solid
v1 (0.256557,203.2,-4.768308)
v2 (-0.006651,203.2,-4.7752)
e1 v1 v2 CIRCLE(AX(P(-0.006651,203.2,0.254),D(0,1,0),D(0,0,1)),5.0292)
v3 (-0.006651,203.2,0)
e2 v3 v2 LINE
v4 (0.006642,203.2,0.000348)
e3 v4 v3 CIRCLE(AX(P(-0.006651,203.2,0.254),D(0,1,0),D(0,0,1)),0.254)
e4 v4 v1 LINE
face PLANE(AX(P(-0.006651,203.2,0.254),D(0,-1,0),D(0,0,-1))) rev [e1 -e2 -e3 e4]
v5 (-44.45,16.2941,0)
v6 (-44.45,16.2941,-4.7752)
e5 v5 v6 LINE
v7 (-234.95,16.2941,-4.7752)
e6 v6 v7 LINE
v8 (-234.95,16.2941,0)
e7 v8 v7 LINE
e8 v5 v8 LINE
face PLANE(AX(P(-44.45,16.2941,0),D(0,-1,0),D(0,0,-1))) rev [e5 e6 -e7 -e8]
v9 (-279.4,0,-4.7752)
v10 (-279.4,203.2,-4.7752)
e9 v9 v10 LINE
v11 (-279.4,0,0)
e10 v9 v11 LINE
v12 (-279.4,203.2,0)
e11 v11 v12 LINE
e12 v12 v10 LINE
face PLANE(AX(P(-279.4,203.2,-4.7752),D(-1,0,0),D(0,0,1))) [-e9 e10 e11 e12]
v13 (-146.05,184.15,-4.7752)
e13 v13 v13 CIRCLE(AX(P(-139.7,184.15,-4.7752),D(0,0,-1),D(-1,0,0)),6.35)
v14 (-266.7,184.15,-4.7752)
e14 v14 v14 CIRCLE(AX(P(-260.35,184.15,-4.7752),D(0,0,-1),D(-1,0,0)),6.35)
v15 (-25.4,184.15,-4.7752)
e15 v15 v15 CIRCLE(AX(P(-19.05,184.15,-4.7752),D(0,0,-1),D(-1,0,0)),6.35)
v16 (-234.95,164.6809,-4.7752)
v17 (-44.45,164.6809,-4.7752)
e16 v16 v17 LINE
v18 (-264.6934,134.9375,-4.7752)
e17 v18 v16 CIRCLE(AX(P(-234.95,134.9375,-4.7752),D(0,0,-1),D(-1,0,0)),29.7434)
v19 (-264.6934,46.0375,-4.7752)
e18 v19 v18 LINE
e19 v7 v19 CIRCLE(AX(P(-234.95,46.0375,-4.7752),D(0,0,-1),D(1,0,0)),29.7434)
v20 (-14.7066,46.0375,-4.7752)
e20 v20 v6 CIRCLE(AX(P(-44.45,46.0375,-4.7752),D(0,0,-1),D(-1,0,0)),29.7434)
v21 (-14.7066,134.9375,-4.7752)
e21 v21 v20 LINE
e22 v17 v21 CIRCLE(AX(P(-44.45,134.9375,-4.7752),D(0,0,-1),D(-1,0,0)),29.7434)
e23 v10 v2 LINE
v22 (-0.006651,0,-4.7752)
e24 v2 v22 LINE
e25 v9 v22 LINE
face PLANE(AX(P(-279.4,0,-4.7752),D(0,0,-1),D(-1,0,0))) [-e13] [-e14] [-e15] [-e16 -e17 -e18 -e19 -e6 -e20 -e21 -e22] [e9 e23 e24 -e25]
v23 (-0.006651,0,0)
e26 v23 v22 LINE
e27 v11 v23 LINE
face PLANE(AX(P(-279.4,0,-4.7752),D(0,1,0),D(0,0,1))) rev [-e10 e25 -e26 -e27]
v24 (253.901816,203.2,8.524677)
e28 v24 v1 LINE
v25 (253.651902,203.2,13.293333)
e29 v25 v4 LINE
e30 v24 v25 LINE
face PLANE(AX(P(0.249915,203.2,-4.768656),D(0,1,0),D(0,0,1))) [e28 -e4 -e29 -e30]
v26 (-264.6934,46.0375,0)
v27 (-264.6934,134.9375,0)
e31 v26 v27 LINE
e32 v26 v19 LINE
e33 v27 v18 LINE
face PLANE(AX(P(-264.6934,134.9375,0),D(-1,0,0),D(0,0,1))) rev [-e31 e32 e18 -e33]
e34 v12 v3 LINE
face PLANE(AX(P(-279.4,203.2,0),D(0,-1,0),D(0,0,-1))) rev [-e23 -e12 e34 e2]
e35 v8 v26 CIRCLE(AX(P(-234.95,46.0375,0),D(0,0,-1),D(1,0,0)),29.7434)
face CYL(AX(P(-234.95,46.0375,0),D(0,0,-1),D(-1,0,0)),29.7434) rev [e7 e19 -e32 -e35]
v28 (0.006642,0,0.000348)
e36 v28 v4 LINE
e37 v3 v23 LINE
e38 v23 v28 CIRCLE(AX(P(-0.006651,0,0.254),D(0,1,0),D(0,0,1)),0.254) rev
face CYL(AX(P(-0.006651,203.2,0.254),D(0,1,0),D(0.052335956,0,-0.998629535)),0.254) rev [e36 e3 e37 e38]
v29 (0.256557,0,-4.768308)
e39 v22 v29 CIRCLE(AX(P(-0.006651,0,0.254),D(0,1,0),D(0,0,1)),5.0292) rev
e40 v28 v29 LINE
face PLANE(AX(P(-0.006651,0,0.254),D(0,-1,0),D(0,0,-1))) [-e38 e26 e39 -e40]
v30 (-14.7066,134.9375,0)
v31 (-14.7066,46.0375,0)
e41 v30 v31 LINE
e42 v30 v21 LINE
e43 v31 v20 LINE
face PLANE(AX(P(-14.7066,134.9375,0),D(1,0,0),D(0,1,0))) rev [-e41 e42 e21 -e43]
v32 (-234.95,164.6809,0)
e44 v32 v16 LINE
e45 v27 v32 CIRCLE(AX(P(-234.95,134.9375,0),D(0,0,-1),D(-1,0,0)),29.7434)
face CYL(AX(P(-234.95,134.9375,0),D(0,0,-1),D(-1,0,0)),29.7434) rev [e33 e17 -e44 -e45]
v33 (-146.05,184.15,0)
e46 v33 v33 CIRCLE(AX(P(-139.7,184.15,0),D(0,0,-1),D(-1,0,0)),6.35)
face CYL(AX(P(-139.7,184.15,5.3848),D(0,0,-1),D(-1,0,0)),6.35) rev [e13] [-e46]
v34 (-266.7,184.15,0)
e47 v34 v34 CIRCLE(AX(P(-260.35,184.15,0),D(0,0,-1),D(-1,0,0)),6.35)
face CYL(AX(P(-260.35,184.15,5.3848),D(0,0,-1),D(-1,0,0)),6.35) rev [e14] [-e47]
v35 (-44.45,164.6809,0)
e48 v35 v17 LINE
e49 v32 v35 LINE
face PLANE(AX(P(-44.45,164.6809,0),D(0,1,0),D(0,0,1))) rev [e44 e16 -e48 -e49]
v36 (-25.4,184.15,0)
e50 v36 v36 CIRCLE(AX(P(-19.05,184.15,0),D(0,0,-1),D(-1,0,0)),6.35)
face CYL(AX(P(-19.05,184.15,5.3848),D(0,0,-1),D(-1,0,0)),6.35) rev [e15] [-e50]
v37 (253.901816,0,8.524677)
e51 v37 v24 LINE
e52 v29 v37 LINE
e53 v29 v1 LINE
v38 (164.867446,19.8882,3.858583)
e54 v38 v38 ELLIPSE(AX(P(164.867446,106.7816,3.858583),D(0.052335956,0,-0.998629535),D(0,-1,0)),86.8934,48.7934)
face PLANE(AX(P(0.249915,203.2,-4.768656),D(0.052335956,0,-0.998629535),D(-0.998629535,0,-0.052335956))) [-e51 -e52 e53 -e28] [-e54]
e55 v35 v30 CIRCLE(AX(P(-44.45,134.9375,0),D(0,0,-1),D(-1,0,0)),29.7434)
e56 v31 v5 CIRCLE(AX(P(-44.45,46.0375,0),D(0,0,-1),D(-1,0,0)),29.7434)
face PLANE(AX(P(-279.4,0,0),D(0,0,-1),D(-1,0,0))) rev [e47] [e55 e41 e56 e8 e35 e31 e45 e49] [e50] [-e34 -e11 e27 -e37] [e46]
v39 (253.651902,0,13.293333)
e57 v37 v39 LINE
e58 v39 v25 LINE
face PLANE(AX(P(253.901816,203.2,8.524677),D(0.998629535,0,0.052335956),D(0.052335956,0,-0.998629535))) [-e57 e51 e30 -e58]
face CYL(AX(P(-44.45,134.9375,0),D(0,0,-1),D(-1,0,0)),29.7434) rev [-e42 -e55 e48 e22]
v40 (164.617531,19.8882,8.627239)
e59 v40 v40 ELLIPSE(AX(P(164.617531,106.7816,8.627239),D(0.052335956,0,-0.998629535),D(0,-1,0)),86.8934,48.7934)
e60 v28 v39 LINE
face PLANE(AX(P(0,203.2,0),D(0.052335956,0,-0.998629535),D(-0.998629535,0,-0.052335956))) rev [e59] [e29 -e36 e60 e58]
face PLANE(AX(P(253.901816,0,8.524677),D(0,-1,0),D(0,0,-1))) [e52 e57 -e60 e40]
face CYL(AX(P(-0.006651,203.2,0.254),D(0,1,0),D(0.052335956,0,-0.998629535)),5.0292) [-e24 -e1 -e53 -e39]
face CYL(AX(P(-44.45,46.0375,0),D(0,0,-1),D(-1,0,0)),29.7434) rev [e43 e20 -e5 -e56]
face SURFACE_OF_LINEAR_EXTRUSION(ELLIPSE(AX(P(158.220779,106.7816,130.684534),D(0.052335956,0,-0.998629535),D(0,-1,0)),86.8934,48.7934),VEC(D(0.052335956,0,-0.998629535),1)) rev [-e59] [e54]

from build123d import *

# Parameters (mm, degrees)
SKETCH1_W                    = 4.7752
SKETCH1_H                    = 203.2
BASE_FLANGE1_DEPTH           = 279.4
SKETCH2_R                    = 6.35
CUT_EXTRUDE1_DEPTH           = 10.16
CUT_EXTRUDE2_DEPTH           = 4.7752
EDGE_FLANGE2_STRIP_CUT_DEPTH = 203.2
EDGE_FLANGE2_DEPTH           = 203.2
SKETCH19_RX                  = 86.8934
SKETCH19_RY                  = 48.7934
CUT_EXTRUDE3_DEPTH           = 127


# Sheet-metal steps are written as plain solids
with BuildPart() as part:
    # Sketch1 → Base-Flange1 (new body)
    with BuildSketch(Plane(origin=(0, 0, 0), x_dir=(0, 0, -1), z_dir=(1, 0, 0))):
        with Locations((2.3876, 101.6)):
            Rectangle(SKETCH1_W, SKETCH1_H)
    extrude(amount=-BASE_FLANGE1_DEPTH)

    # Sketch2 → Cut-Extrude1 (cut)
    with BuildSketch(Plane(origin=(0, 0, -4.7752), x_dir=(-1, 0, 0), z_dir=(0, 0, -1))):
        with Locations((19.05, 184.15)):
            Circle(SKETCH2_R)
        with Locations((139.7, 184.15)):
            Circle(SKETCH2_R)
        with Locations((260.35, 184.15)):
            Circle(SKETCH2_R)
    extrude(amount=-CUT_EXTRUDE1_DEPTH, mode=Mode.SUBTRACT)

    # Sketch3 → Cut-Extrude2 (cut)
    with BuildSketch(Plane(origin=(0, 0, -4.7752), x_dir=(-1, 0, 0), z_dir=(0, 0, -1))):
        with BuildLine():
            Line((14.7066, 134.9375), (14.7066, 46.0375))
            ThreePointArc((14.7066, 46.0375), (23.418240164, 25.005740164), (44.45, 16.2941))
            Line((44.45, 16.2941), (234.95, 16.2941))
            ThreePointArc((234.95, 16.2941), (255.981759836, 25.005740164), (264.6934, 46.0375))
            Line((264.6934, 46.0375), (264.6934, 134.9375))
            ThreePointArc((264.6934, 134.9375), (255.981759836, 155.969259836), (234.95, 164.6809))
            Line((234.95, 164.6809), (44.45, 164.6809))
            ThreePointArc((44.45, 164.6809), (23.418240164, 155.969259836), (14.7066, 134.9375))
        make_face()
        with BuildLine():
            Line((44.45, 153.9875), (234.95, 153.9875))
            ThreePointArc((234.95, 153.9875), (248.420384182, 148.407884182), (254, 134.9375))
            Line((254, 134.9375), (254, 46.0375))
            ThreePointArc((254, 46.0375), (248.420384182, 32.567115818), (234.95, 26.9875))
            Line((234.95, 26.9875), (44.45, 26.9875))
            ThreePointArc((44.45, 26.9875), (30.979615818, 32.567115818), (25.4, 46.0375))
            Line((25.4, 46.0375), (25.4, 134.9375))
            ThreePointArc((25.4, 134.9375), (30.979615818, 148.407884182), (44.45, 153.9875))
        make_face(mode=Mode.SUBTRACT)
    extrude(amount=-CUT_EXTRUDE2_DEPTH, mode=Mode.SUBTRACT)


with BuildPart() as cut_extrude2_kept_piece:
    # of the separate pieces the step leaves, the one the design keeps (cut_extrude2_pieces_kept)
    add(part.part.solids().sort_by_distance((0, 0, 0))[0])

    # Edge-Flange2 strip (across the edge) → Edge-Flange2 strip cut (cut)
    with BuildSketch(Plane(origin=(0, 0, 0), x_dir=(-0.052335956242937604, 0, 0.9986295347545743), z_dir=(0, 1, 0))):
        Polygon((-5.794552955, 19.325370054), (-4.768307656, -0.256556767), (0.000348098, -0.006642109), (-1.025897201, 19.575284712), align=None)
    extrude(amount=EDGE_FLANGE2_STRIP_CUT_DEPTH, mode=Mode.SUBTRACT)

    # Edge-Flange2 section (across the edge) → Edge-Flange2 (add)
    with BuildSketch(Plane(origin=(0, 0, 0), x_dir=(-0.052335956242937604, 0, 0.9986295347545743), z_dir=(0, 1, 0))):
        with BuildLine():
            Line((-4.7752, 0.006651224), (-4.7752, 254))
            Line((-4.7752, 254), (0, 254))
            Line((0, 254), (0, 0.006651224))
            ThreePointArc((0, 0.006651224), (8.7039e-05, 2.279e-06), (0.000348098, -0.006642109))
            Line((0.000348098, -0.006642109), (-4.768307656, -0.256556767))
            ThreePointArc((-4.768307656, -0.256556767), (-4.773476619, -0.124997884), (-4.7752, 0.006651224))
        make_face()
    extrude(amount=EDGE_FLANGE2_DEPTH)

    # Sketch19 → Cut-Extrude3 (cut)
    with BuildSketch(Plane(origin=(0.249914658, 0, -4.768655754), x_dir=(-0.9986295347545743, 0, -0.052335956242937624), z_dir=(0.052335956242937624, 0, -0.9986295347545743))):
        with Locations(Location((-164.843443233, 106.7816), (0, 0, 90))):
            Ellipse(SKETCH19_RX, SKETCH19_RY)
    extrude(amount=-CUT_EXTRUDE3_DEPTH, mode=Mode.SUBTRACT)


solid = cut_extrude2_kept_piece.part
